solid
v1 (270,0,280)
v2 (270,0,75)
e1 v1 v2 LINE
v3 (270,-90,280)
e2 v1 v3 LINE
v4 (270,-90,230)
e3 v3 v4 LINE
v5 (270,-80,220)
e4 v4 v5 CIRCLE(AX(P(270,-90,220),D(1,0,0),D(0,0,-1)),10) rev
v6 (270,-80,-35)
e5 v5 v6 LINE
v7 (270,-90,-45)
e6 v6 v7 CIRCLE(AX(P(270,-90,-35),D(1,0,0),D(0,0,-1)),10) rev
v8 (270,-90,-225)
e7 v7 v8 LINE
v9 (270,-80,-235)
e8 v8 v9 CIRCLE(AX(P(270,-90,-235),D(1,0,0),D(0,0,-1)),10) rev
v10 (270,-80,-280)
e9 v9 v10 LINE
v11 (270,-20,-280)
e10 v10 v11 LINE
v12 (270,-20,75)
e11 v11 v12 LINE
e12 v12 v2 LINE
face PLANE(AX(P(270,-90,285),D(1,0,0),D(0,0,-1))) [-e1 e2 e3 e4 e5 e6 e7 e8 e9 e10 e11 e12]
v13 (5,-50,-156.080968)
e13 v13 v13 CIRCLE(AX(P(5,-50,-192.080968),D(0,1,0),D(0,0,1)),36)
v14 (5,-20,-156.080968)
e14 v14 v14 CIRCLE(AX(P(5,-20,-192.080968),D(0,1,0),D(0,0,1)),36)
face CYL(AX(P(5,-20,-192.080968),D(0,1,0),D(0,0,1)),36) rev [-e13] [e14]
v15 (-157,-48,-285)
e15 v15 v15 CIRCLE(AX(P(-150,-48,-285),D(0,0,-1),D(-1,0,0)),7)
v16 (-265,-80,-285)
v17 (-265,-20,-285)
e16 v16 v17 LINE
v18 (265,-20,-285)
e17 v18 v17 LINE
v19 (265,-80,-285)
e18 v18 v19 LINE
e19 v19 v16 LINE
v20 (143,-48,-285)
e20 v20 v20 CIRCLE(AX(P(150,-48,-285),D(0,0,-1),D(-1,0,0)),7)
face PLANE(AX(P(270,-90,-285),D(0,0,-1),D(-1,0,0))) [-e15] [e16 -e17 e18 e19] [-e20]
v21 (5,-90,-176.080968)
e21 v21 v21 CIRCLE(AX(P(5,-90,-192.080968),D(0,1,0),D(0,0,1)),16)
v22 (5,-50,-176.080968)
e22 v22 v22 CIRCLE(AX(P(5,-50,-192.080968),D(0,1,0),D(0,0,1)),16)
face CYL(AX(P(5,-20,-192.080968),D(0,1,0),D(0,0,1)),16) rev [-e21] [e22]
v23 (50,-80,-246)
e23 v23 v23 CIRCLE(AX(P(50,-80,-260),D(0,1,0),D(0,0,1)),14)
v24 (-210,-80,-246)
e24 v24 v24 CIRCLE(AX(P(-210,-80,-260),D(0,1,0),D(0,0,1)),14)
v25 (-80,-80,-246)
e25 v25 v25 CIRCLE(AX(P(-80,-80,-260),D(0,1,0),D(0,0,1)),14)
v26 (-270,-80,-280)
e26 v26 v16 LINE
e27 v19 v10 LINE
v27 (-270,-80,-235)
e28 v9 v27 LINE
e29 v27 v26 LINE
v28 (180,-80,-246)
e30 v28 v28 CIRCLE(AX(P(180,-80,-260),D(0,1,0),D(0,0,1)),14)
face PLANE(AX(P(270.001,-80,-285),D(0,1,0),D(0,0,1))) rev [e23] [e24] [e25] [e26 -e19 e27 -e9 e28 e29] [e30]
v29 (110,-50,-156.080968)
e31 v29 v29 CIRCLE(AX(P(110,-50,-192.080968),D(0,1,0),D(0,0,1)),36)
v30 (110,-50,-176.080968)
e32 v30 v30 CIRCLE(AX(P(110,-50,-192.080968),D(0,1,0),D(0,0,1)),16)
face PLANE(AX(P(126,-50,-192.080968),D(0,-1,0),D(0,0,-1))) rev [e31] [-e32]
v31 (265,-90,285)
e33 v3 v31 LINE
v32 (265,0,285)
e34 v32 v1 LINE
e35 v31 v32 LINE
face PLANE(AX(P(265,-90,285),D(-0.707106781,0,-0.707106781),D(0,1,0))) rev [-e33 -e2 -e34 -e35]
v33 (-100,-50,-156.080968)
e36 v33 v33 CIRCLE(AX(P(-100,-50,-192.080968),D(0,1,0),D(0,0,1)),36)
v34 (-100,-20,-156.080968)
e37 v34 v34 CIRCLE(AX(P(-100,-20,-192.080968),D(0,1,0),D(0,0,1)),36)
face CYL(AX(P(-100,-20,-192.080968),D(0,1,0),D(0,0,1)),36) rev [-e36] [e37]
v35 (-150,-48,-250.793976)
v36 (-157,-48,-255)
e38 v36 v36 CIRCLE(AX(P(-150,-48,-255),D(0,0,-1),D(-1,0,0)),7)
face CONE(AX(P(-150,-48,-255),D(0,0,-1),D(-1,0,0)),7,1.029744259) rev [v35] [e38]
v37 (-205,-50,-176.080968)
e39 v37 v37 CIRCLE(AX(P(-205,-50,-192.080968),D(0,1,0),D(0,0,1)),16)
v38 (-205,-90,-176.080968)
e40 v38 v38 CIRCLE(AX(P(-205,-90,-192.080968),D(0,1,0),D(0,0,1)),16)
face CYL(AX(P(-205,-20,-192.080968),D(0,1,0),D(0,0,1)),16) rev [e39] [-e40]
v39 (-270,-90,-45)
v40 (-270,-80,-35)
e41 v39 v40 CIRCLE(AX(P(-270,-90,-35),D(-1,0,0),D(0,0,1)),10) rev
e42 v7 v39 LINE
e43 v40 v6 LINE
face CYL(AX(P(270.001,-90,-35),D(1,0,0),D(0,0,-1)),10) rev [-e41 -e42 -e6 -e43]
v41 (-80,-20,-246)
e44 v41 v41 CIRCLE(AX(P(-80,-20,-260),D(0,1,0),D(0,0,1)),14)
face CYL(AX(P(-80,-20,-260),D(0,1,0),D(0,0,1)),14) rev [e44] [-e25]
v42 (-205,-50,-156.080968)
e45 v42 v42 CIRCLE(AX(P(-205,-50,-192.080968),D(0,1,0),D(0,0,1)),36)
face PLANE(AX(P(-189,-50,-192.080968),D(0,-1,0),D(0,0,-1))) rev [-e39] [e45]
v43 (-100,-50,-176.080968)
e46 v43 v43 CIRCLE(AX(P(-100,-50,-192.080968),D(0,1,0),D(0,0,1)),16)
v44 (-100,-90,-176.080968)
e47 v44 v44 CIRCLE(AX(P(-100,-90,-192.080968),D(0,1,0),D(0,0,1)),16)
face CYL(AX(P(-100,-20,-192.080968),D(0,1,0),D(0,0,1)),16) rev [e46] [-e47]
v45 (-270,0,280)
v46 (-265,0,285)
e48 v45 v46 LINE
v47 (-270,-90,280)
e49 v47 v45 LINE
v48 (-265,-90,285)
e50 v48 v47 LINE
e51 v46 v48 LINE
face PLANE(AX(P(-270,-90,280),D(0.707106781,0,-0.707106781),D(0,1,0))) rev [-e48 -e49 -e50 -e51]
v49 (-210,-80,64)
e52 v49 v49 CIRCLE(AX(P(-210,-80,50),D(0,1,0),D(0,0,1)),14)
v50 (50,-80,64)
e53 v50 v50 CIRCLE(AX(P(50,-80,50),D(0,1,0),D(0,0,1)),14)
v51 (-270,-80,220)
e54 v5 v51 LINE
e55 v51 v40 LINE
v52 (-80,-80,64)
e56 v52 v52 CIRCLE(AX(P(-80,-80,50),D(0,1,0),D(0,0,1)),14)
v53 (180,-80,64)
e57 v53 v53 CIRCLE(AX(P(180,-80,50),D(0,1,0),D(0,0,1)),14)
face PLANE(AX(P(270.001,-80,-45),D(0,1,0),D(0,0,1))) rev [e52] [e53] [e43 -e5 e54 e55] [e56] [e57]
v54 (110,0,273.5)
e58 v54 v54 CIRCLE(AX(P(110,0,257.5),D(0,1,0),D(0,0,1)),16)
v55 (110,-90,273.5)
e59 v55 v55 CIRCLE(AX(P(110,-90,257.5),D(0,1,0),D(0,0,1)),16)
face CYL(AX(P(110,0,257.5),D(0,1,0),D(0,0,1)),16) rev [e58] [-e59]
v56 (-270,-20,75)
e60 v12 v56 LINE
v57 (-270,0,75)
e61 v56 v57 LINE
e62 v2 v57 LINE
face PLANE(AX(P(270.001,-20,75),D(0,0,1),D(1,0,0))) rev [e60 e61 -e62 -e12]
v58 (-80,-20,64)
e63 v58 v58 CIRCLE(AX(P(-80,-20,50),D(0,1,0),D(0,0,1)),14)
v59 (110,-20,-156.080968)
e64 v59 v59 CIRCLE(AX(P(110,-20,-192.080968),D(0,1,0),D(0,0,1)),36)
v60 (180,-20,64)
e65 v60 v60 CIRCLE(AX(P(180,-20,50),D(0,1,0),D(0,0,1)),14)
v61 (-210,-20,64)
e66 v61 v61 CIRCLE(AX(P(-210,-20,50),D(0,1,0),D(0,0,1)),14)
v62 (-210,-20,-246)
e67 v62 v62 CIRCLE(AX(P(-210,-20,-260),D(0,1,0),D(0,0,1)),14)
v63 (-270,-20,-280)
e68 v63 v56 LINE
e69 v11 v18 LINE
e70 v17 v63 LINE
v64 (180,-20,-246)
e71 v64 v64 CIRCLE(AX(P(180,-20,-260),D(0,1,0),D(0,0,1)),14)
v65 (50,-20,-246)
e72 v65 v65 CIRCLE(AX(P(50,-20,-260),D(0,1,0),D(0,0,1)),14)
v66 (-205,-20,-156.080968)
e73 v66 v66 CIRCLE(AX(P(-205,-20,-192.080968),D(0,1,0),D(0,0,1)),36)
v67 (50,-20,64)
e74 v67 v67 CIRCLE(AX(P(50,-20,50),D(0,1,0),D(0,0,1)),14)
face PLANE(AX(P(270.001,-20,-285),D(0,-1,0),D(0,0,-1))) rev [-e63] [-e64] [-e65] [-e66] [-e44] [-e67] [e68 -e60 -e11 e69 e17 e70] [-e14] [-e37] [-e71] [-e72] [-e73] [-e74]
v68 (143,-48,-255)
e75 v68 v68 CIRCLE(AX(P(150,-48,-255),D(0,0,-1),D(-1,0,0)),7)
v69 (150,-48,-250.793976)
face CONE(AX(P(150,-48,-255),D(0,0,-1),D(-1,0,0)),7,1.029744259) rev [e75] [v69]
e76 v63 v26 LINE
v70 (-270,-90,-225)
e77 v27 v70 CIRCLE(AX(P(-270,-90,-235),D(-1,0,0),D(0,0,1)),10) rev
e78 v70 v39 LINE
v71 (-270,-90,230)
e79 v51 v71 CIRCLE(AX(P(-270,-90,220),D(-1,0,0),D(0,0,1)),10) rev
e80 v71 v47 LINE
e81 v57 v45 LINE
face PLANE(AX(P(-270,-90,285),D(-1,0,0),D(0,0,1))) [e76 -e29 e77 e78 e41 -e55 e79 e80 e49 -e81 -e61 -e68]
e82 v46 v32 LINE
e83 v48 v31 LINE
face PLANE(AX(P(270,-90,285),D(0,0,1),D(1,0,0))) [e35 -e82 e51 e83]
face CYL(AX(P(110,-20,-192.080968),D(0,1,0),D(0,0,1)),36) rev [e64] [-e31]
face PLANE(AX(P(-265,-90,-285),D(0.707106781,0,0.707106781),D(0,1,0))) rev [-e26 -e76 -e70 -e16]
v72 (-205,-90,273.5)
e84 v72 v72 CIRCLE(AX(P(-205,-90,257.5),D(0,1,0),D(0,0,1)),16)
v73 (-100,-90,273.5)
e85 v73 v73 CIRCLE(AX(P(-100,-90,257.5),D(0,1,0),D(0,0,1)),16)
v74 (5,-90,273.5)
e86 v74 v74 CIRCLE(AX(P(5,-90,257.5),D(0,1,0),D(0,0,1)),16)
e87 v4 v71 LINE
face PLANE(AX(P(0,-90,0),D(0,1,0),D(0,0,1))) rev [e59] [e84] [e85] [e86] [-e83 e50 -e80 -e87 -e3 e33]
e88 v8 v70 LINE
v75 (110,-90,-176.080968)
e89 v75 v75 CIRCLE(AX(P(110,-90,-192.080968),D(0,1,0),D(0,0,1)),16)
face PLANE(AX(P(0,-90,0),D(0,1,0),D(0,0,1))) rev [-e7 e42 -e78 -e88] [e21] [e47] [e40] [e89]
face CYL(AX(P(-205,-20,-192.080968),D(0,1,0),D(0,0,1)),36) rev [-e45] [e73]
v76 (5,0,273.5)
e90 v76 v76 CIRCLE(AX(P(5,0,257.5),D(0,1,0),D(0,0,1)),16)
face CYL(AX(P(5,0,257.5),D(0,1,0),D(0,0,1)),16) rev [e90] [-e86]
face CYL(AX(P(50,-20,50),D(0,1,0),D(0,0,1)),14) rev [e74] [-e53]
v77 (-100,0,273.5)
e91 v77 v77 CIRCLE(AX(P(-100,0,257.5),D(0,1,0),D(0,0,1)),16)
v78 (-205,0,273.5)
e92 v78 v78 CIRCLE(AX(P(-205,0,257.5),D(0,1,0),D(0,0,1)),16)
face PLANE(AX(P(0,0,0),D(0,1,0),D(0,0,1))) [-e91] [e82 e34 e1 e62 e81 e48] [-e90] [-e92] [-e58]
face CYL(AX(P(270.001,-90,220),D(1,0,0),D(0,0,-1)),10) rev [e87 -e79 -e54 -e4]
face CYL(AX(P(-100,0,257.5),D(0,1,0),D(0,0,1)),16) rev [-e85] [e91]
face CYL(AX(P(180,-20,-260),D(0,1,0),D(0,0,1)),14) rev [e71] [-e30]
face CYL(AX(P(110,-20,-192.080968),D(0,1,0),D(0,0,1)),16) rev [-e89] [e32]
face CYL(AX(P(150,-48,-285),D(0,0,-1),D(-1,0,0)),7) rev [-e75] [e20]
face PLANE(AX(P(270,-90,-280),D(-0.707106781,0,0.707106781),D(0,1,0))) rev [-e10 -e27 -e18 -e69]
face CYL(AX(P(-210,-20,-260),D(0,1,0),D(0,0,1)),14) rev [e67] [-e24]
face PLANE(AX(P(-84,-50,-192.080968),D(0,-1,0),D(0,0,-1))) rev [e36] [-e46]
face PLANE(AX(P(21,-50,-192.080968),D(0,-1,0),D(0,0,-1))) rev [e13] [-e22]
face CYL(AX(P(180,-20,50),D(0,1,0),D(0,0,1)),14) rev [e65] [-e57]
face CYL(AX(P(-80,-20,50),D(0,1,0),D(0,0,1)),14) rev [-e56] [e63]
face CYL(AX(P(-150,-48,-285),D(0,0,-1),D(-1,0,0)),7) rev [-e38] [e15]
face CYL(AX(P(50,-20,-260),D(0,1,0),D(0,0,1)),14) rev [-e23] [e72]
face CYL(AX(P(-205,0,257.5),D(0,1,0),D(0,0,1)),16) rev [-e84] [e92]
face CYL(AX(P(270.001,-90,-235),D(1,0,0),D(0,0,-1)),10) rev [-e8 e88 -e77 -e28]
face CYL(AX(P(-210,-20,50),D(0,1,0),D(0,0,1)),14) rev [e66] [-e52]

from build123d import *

# Parameters (mm, degrees)
SKETCH_1_W                     = 540
SKETCH_1_H                     = 570
EXTRUDE_1_DEPTH                = 90
CUT_EXTRUDE_1_REACH            = 619.191
SKETCH_2_W                     = 360
SKETCH_2_H                     = 20
SKETCH_2_W_2                   = 60
SKETCH_2_H_2                   = 10
SKETCH_2_W_3                   = 275
M30X2_0_1_D                    = 28
PATTERN_LINEAR_1_COUNT         = 4
PATTERN_LINEAR_1_PITCH         = 130
PATTERN_LINEAR_1_COUNT_DIR2    = 2
PATTERN_LINEAR_1_PITCH_DIR2    = 310
HOLE_WIZARD_M1_6_1_D           = 32
HOLE_WIZARD_M1_6_1_CBORE_D     = 72
HOLE_WIZARD_M1_6_1_CBORE_DEPTH = 30
PATTERN_LINEAR_2_COUNT         = 4
PATTERN_LINEAR_2_PITCH         = 105
HOLE_WIZARD_1_0_1_1_D          = 32
PATTERN_LINEAR_3_COUNT         = 4
PATTERN_LINEAR_3_PITCH         = 105
FILLET_1_R                     = 10
HOLE_WIZARD_M16_1_D            = 14
HOLE_WIZARD_M16_1_DEPTH        = 30
HOLE_WIZARD_M16_1_TIP          = 4.206024333
CHAMFER_1_SIZE                 = 5


with BuildPart() as part:
    # 草图1 → 凸台-拉伸1 (new body)
    with BuildSketch(Plane(origin=(0, 0, 0), x_dir=(1, 0, 0), z_dir=(0, 1, 0))):
        Rectangle(SKETCH_1_W, SKETCH_1_H)
    extrude(amount=-EXTRUDE_1_DEPTH)

    # 草图2 → 切除-拉伸1 (cut, up to next)
    with BuildSketch(Plane.ZY.offset(270), mode=Mode.PRIVATE) as cut_extrude_1_sk1:
        with Locations((-105, -10)):
            Rectangle(SKETCH_2_W, SKETCH_2_H)
    cut_extrude_1_tool1 = extrude(cut_extrude_1_sk1.sketch, amount=-CUT_EXTRUDE_1_REACH, mode=Mode.PRIVATE) & part.part
    # 草图2 → 切除-拉伸1 (cut, up to next)
    with BuildSketch(Plane.ZY.offset(270), mode=Mode.PRIVATE) as cut_extrude_1_sk2:
        with Locations((-255, -85)):
            Rectangle(SKETCH_2_W_2, SKETCH_2_H_2)
    cut_extrude_1_tool2 = extrude(cut_extrude_1_sk2.sketch, amount=-CUT_EXTRUDE_1_REACH, mode=Mode.PRIVATE) & part.part
    # 草图2 → 切除-拉伸1 (cut, up to next)
    with BuildSketch(Plane.ZY.offset(270), mode=Mode.PRIVATE) as cut_extrude_1_sk3:
        with Locations((92.5, -85)):
            Rectangle(SKETCH_2_W_3, SKETCH_2_H_2)
    cut_extrude_1_tool3 = extrude(cut_extrude_1_sk3.sketch, amount=-CUT_EXTRUDE_1_REACH, mode=Mode.PRIVATE) & part.part
    add(cut_extrude_1_tool1.solids().sort_by_distance((-270, -10, -105))[0], mode=Mode.SUBTRACT)
    add(cut_extrude_1_tool2.solids().sort_by_distance((-270, -85, -255))[0], mode=Mode.SUBTRACT)
    add(cut_extrude_1_tool3.solids().sort_by_distance((-270, -85, 92.5))[0], mode=Mode.SUBTRACT)

    # M30x2.0 螺纹孔1 (through all)
    with Locations(Plane(origin=(180, -20, 50), x_dir=(0, 0, 1), z_dir=(0, 1, 0))):
        with Locations((0, 0)):
            m30x2_0_1 = Hole(M30X2_0_1_D / 2)

    # 阵列(线性)1: M30x2.0 _1 4 × 2
    with Locations(*[(-i * PATTERN_LINEAR_1_PITCH, 0, -j * PATTERN_LINEAR_1_PITCH_DIR2) for i in range(PATTERN_LINEAR_1_COUNT) for j in range(PATTERN_LINEAR_1_COUNT_DIR2) if (i, j) != (0, 0)]):
        add(m30x2_0_1, mode=Mode.SUBTRACT)

    # M1.6 六角头螺栓的柱形沉头孔1 (through all)
    with Locations(Plane(origin=(-205, -20, -192.080967971), x_dir=(0, 0, 1), z_dir=(0, 1, 0))):
        with Locations((0, 0)):
            hole_wizard_m1_6_1 = CounterBoreHole(HOLE_WIZARD_M1_6_1_D / 2, HOLE_WIZARD_M1_6_1_CBORE_D / 2, HOLE_WIZARD_M1_6_1_CBORE_DEPTH)

    # 阵列(线性)2: M1.6 六角头螺栓的柱形沉头孔1 ×4
    with Locations(*[(i * PATTERN_LINEAR_2_PITCH, 0, 0) for i in range(1, PATTERN_LINEAR_2_COUNT)]):
        add(hole_wizard_m1_6_1, mode=Mode.SUBTRACT)

    # Ø1.0 (1) 直径孔1 (through all)
    with Locations(Plane(origin=(-205, 0, 257.5), x_dir=(0, 0, 1), z_dir=(0, 1, 0))):
        with Locations((0, 0)):
            hole_wizard_1_0_1_1 = Hole(HOLE_WIZARD_1_0_1_1_D / 2)

    # 阵列(线性)3: Ø1.0 (1) 直径孔1 ×4
    with Locations(*[(i * PATTERN_LINEAR_3_PITCH, 0, 0) for i in range(1, PATTERN_LINEAR_3_COUNT)]):
        add(hole_wizard_1_0_1_1, mode=Mode.SUBTRACT)

    # 圆角1
    fillet_1_edges = [part.edges().sort_by_distance(p)[0] for p in [
        (0, -80, -45),
        (0, -80, 230),
        (0, -80, -225),
    ]]
    fillet(fillet_1_edges, radius=FILLET_1_R - 0.0001)  # a hair under: the kernel refuses the full size

    # M16 螺纹孔1
    with Locations(Plane(origin=(-150, -48, -285), x_dir=(-1, 0, 0), z_dir=(0, 0, -1))):
        with Locations((0, 0), (-300, 0)):
            Hole(HOLE_WIZARD_M16_1_D / 2, depth=HOLE_WIZARD_M16_1_DEPTH)
            with Locations((0, 0, -(HOLE_WIZARD_M16_1_DEPTH + HOLE_WIZARD_M16_1_TIP / 2))):  # 118° drill point
                Cone(0, HOLE_WIZARD_M16_1_D / 2, HOLE_WIZARD_M16_1_TIP, mode=Mode.SUBTRACT)

    # 倒角1
    chamfer_1_edges = [part.edges().sort_by_distance(p)[0] for p in [
        (270, -50, -285),
        (-270, -50, -285),
        (270, -45, 285),
        (-270, -45, 285),
    ]]
    chamfer(chamfer_1_edges, length=CHAMFER_1_SIZE)


solid = part.part
